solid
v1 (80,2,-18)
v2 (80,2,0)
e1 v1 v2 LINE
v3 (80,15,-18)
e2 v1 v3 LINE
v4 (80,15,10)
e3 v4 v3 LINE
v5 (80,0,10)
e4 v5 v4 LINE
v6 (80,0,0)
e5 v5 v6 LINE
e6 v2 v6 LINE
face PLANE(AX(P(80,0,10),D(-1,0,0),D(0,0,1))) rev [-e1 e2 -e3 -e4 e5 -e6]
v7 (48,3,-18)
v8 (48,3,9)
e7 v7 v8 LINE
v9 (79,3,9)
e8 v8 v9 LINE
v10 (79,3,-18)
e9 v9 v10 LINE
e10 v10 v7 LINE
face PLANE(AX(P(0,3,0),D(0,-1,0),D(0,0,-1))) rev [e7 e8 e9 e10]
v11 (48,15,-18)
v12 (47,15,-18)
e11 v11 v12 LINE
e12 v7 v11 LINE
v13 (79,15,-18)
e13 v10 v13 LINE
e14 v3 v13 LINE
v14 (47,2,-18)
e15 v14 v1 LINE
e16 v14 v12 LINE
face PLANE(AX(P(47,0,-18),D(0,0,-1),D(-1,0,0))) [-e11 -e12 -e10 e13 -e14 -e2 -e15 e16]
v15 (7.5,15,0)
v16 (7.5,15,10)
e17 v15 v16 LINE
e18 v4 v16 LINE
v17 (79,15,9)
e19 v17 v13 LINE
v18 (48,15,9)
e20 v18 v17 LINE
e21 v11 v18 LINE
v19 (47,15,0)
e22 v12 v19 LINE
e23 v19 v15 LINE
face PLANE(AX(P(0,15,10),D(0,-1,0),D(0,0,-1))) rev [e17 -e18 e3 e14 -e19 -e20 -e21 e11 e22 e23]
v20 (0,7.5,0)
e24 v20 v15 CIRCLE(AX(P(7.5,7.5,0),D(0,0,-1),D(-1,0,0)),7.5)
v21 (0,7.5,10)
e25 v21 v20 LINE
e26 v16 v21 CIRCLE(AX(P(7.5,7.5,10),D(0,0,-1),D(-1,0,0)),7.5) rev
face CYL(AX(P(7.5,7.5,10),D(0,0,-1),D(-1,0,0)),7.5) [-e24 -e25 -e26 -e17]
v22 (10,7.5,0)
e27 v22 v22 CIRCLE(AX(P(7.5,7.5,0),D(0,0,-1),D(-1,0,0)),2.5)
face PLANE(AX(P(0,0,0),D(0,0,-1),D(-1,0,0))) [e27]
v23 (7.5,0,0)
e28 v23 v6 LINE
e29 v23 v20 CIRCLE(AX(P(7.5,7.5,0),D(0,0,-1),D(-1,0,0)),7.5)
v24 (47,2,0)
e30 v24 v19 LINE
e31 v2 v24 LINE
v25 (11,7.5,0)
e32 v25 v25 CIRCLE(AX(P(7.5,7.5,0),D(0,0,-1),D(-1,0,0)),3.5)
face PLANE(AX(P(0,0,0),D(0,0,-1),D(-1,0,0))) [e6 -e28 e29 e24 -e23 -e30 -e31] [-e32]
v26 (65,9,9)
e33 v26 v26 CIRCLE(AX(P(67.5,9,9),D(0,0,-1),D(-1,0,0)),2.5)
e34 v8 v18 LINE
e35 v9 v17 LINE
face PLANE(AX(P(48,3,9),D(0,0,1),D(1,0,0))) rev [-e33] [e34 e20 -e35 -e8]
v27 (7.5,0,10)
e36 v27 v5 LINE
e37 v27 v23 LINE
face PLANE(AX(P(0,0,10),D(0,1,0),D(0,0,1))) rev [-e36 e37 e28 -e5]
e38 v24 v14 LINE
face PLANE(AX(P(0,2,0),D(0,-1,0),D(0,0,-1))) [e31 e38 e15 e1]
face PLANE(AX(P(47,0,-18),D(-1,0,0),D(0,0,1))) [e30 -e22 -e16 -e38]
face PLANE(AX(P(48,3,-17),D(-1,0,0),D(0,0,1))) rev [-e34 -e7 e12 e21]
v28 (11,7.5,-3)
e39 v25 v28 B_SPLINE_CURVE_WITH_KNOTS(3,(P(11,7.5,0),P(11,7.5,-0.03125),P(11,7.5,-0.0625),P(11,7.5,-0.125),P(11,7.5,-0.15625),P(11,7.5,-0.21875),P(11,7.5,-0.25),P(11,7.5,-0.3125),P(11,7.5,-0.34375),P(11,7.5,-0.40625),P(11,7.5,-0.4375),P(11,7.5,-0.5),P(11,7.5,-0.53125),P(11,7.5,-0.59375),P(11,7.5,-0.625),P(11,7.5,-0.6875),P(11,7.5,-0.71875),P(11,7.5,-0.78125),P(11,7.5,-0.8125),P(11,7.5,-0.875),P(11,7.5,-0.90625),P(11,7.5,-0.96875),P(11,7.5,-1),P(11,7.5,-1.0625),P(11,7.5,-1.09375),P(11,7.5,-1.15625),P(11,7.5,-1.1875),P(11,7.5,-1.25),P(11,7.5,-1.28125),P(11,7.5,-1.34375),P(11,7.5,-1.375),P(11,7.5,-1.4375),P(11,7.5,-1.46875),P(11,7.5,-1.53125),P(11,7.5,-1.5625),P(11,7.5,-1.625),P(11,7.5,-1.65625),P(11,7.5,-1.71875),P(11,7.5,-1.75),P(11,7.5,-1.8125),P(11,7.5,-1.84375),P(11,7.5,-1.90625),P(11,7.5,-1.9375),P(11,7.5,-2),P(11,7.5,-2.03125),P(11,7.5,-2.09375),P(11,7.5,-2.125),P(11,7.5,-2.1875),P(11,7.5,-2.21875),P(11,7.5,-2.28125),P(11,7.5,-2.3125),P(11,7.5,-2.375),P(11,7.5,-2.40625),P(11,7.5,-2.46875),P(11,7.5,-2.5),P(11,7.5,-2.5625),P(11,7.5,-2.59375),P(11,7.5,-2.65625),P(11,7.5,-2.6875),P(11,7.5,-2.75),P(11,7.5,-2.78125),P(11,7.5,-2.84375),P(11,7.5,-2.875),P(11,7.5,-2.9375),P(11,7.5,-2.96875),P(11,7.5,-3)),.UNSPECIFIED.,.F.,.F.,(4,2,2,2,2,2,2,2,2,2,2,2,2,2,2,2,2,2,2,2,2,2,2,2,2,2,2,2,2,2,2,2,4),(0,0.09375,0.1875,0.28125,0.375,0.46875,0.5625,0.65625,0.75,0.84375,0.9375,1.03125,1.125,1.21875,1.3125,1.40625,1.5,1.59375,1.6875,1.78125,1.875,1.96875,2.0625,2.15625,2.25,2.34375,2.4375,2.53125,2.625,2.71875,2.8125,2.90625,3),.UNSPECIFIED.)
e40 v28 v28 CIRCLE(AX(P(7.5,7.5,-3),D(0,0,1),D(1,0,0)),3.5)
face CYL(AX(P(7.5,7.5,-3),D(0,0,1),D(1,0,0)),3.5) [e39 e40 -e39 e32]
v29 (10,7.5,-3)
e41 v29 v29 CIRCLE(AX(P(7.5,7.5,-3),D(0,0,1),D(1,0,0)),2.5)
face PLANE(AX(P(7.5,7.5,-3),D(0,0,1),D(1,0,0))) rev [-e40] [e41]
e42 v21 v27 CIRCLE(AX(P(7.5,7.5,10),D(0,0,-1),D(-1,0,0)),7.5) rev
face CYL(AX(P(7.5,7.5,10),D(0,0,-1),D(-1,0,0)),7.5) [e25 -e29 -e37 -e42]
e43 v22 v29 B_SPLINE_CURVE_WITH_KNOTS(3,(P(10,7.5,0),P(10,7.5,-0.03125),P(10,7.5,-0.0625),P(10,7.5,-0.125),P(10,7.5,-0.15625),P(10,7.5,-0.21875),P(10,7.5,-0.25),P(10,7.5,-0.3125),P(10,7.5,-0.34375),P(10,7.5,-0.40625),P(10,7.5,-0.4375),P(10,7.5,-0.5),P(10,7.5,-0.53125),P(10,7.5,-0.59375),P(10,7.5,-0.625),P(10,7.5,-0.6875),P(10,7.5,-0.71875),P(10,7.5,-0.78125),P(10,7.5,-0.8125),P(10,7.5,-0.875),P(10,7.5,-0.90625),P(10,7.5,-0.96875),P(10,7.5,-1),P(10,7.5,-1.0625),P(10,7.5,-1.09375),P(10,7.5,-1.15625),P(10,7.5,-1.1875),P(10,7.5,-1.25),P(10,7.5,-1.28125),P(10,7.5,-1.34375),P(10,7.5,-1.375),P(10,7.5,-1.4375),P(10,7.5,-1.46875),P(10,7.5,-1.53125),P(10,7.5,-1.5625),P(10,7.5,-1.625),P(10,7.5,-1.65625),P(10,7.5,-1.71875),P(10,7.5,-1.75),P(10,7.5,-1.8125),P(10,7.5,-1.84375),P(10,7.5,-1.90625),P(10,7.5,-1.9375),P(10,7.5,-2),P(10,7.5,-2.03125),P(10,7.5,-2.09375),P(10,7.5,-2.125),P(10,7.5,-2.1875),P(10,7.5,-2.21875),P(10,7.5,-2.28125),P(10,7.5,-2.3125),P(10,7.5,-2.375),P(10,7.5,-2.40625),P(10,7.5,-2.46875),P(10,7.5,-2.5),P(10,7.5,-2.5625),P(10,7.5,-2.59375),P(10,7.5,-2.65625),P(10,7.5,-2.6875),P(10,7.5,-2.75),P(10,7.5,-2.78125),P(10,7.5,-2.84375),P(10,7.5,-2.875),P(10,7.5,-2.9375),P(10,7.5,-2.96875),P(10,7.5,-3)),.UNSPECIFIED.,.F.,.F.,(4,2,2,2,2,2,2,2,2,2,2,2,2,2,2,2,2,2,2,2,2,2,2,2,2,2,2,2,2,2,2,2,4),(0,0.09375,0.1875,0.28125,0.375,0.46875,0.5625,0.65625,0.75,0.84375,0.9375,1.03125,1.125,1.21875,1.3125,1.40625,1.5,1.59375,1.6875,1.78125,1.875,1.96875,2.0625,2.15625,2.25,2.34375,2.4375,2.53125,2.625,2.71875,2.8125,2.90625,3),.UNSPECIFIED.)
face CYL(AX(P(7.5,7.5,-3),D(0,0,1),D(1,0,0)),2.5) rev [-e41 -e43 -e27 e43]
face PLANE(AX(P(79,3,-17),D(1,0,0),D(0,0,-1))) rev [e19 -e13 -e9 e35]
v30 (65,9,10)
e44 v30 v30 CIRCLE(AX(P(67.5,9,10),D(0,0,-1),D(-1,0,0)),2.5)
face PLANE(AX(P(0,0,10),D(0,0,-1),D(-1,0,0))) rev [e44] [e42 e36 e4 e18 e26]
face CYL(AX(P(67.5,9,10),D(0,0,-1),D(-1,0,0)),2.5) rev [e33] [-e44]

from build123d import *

# Parameters (mm, degrees)
SKETCH1_W                = 80
SKETCH1_H                = 15
BOSS_EXTRUDE1_DEPTH      = 10
FILLET1_R                = 7.5
BOSS_EXTRUDE2_DEPTH      = 2
BOSS_EXTRUDE2_DEPTH_BACK = 13
SKETCH2_R                = 3.5
SKETCH2_R_2              = 2.5
SKETCH4_W                = 12.275600057
SKETCH4_H                = 15
CUT_EXTRUDE1_DEPTH       = 39
SKETCH6_W                = 10
SKETCH6_H                = 14.887271561
CUT_EXTRUDE2_DEPTH       = 39
SKETCH8_W                = 33
SKETCH8_H                = 28
BOSS_EXTRUDE3_DEPTH      = 15
CUT_EXTRUDE3_DEPTH       = 12
SKETCH10_W               = 33
SKETCH10_H               = 18
CUT_EXTRUDE4_DEPTH       = 2
SKETCH11_W               = 11.438718319
SKETCH11_H               = 15
CUT_EXTRUDE5_DEPTH       = 84.360662185
SKETCH12_R               = 2.5
CUT_EXTRUDE6_DEPTH       = 86.755466298


with BuildPart() as part:
    # Sketch1 → Boss-Extrude1 (new body)
    with BuildSketch(Plane.XY):
        with Locations((40, 7.5)):
            Rectangle(SKETCH1_W, SKETCH1_H)
    extrude(amount=BOSS_EXTRUDE1_DEPTH)

    # Fillet1
    fillet1_edges = [part.edges().sort_by_distance(p)[0] for p in [
        (0, 0, 5),
        (0, 15, 5),
    ]]
    fillet(fillet1_edges, radius=FILLET1_R - 0.0001)  # a hair under: the kernel refuses the full size

    # Sketch2 → Boss-Extrude2 (add, two sides: drawn at the far end of the back side and taken through both)
    # profile 1 of 2: a face of its own
    with BuildSketch(Plane.XY.offset(10).offset(-BOSS_EXTRUDE2_DEPTH_BACK)):
        with Locations((7.5, 7.5)):
            Circle(SKETCH2_R)
        with Locations((7.5, 7.5)):
            Circle(SKETCH2_R_2, mode=Mode.SUBTRACT)
    # profile 2 of 2: a face of its own
    with BuildSketch(Plane.XY.offset(10).offset(-BOSS_EXTRUDE2_DEPTH_BACK)):
        with Locations((72.5, 7.5)):
            Circle(SKETCH2_R)
        with Locations((72.5, 7.5)):
            Circle(SKETCH2_R_2, mode=Mode.SUBTRACT)
    extrude(amount=BOSS_EXTRUDE2_DEPTH + BOSS_EXTRUDE2_DEPTH_BACK)

    # Sketch4 → Cut-Extrude1 (cut)
    with BuildSketch(Plane(origin=(80, 0, 0), x_dir=(0, 0, -1), z_dir=(1, 0, 0))):
        with Locations((6.137800029, 7.5)):
            Rectangle(SKETCH4_W, SKETCH4_H)
    extrude(amount=-CUT_EXTRUDE1_DEPTH, mode=Mode.SUBTRACT)

    # Sketch6 → Cut-Extrude2 (cut)
    with BuildSketch(Plane(origin=(0, 0, 0), x_dir=(0, 0, -1), z_dir=(1, 0, 0))):
        with Locations((-15, 7.443635781)):
            Rectangle(SKETCH6_W, SKETCH6_H)
    extrude(amount=CUT_EXTRUDE2_DEPTH, mode=Mode.SUBTRACT)

    # Sketch8 → Boss-Extrude3 (add)
    with BuildSketch(Plane(origin=(0, 15, 0), x_dir=(1, 0, 0), z_dir=(0, 1, 0))):
        with Locations((63.5, 4)):
            Rectangle(SKETCH8_W, SKETCH8_H)
    extrude(amount=-BOSS_EXTRUDE3_DEPTH)

    # Sketch9 → Cut-Extrude3 (cut)
    with BuildSketch(Plane(origin=(0, 15, 0), x_dir=(1, 0, 0), z_dir=(0, 1, 0))):
        Polygon((48, 17), (48, -9), (79, -9), (79, 17), (79, 18), (48, 18), align=None)
    extrude(amount=-CUT_EXTRUDE3_DEPTH, mode=Mode.SUBTRACT)

    # Sketch10 → Cut-Extrude4 (cut)
    with BuildSketch(Plane.XZ):
        with Locations((63.5, -9)):
            Rectangle(SKETCH10_W, SKETCH10_H)
    extrude(amount=-CUT_EXTRUDE4_DEPTH, mode=Mode.SUBTRACT)

    # Sketch11 → Cut-Extrude5 (cut, through all)
    with BuildSketch(Plane(origin=(80, 0, 0), x_dir=(0, 0, -1), z_dir=(1, 0, 0))):
        with Locations((-15.71935916, 7.5)):
            Rectangle(SKETCH11_W, SKETCH11_H)
    extrude(amount=-CUT_EXTRUDE5_DEPTH, mode=Mode.SUBTRACT)

    # Sketch12 → Cut-Extrude6 (cut, through all)
    with BuildSketch(Plane(origin=(0, 0, 9), x_dir=(-1, 0, 0), z_dir=(0, 0, -1))):
        with Locations((-67.5, 9)):
            Circle(SKETCH12_R)
    extrude(amount=-CUT_EXTRUDE6_DEPTH, mode=Mode.SUBTRACT)


solid = part.part
